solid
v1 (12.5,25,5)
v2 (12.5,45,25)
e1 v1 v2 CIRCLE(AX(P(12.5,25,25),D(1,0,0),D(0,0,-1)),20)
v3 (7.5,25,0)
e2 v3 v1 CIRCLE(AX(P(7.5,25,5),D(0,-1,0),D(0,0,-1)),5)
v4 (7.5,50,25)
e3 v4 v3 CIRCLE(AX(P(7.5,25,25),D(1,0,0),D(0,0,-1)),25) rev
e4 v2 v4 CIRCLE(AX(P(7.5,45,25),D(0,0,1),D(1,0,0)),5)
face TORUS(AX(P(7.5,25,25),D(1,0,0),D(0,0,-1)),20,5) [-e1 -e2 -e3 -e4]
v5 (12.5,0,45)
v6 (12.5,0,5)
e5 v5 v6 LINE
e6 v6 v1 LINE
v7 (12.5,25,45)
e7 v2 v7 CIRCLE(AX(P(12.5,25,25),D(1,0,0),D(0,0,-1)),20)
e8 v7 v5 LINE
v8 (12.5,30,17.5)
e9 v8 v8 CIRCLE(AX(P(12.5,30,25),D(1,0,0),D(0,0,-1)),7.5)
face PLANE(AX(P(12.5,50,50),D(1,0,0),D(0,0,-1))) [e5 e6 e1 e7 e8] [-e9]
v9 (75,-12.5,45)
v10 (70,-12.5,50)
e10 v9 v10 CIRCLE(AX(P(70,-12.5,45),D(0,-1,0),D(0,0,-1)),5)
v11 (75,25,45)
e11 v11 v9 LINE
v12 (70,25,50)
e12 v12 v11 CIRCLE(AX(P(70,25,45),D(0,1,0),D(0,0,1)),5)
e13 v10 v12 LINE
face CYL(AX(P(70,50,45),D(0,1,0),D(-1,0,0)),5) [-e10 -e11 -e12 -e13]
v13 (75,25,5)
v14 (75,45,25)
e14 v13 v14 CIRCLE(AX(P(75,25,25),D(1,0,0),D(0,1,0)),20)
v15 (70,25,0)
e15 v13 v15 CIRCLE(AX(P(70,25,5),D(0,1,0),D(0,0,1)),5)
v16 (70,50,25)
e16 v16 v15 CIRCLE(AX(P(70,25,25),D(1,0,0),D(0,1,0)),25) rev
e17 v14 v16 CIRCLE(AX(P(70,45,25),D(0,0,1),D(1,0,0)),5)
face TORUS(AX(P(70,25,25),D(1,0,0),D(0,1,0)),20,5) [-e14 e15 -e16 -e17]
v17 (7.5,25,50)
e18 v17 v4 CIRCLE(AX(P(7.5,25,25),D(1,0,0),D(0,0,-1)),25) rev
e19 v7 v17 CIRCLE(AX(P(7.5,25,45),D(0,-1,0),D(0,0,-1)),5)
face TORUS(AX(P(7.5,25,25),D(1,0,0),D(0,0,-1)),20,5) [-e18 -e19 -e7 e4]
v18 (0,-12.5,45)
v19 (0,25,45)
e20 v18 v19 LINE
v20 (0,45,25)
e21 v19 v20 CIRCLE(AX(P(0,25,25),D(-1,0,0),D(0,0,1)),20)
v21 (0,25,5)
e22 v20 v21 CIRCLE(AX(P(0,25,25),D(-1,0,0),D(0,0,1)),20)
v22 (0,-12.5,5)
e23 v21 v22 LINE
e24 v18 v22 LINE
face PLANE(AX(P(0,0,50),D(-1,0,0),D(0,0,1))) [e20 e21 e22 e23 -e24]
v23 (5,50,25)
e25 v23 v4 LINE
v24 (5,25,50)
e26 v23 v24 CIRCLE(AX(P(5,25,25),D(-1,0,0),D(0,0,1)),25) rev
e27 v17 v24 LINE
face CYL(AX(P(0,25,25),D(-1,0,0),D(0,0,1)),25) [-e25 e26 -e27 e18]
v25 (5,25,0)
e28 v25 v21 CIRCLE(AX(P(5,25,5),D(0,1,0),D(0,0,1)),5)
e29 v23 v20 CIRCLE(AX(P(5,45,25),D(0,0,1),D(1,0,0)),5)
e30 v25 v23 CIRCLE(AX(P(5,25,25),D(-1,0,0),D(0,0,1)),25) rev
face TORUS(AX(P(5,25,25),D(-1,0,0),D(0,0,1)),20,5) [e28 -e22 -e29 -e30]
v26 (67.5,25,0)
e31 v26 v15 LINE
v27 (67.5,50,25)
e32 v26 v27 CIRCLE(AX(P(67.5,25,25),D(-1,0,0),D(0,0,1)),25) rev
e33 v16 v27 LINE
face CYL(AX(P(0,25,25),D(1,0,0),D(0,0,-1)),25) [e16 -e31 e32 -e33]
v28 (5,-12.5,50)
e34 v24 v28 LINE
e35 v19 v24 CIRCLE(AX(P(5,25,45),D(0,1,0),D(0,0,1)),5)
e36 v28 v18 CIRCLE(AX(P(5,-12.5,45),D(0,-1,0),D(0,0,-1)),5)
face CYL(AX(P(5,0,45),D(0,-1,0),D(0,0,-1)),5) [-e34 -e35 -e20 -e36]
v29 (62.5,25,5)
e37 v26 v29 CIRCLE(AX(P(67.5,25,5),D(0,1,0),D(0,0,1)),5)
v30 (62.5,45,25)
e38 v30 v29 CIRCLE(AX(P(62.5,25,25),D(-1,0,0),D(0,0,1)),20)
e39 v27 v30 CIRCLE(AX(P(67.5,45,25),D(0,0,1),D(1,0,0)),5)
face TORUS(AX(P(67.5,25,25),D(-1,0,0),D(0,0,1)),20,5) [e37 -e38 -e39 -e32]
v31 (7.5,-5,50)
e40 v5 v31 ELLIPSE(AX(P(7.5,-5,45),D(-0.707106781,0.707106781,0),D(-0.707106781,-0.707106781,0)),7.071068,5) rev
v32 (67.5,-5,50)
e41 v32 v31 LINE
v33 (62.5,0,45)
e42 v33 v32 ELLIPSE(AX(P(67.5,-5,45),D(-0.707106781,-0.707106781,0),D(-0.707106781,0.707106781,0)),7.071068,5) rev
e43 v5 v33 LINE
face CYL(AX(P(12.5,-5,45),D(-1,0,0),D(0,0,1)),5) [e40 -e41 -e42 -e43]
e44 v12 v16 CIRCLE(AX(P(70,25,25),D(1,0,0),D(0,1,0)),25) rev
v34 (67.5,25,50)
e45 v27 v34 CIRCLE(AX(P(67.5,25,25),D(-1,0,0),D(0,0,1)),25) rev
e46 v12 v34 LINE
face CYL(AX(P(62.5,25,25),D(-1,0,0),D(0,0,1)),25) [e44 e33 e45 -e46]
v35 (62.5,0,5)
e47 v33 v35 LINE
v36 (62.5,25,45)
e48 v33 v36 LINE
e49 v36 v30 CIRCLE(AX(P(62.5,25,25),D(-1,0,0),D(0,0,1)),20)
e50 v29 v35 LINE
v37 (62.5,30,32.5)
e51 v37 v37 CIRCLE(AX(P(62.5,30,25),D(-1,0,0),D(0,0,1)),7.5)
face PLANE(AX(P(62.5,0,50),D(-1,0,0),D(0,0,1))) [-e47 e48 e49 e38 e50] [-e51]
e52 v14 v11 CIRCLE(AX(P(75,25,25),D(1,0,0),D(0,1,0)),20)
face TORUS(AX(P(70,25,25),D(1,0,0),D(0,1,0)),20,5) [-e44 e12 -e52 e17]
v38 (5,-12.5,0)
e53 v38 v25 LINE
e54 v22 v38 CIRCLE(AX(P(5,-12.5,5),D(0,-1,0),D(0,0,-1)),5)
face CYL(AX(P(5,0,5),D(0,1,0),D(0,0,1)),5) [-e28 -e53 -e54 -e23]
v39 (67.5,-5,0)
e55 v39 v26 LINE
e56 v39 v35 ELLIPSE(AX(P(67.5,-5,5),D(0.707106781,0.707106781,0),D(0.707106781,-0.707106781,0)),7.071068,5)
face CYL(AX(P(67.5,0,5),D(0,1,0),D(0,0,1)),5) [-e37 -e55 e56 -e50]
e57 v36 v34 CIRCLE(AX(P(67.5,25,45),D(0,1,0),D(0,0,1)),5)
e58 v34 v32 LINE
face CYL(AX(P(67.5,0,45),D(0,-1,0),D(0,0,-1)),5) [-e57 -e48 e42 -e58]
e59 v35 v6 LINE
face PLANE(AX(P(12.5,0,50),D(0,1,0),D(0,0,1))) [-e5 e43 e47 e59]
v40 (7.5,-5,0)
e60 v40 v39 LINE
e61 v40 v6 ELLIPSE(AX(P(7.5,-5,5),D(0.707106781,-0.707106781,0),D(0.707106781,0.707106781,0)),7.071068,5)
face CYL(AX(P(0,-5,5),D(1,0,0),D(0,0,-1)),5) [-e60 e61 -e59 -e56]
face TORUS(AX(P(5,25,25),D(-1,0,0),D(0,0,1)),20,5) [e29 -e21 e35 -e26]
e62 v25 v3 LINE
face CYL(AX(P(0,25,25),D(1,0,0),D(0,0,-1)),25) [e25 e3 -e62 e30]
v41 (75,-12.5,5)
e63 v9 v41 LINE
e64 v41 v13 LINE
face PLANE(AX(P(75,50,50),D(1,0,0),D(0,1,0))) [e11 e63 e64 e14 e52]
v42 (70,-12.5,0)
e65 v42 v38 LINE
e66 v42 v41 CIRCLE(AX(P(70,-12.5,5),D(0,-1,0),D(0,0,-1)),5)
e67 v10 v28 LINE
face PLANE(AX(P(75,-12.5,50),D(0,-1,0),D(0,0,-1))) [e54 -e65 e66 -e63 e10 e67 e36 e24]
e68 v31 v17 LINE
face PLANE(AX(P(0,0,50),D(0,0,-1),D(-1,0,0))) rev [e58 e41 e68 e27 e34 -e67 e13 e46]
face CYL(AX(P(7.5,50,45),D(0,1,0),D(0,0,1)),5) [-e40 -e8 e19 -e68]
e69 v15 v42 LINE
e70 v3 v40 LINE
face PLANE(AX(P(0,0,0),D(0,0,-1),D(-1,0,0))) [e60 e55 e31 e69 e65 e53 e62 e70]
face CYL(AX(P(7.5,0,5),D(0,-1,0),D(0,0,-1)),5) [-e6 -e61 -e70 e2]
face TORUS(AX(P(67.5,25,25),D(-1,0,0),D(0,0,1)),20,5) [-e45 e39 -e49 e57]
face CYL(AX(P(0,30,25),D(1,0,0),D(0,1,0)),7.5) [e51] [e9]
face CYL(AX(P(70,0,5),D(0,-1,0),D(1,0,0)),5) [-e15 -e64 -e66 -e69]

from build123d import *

# Parameters (mm, degrees)
SALIENTE_EXTRUIR1_DEPTH = 50
CROQUIS2_R              = 7.5
SALIENTE_EXTRUIR2_DEPTH = 75
REDONDEO1_R             = 25
REDONDEO2_R             = 5


with BuildPart() as part:
    # Croquis1 → Saliente-Extruir1 (new body)
    with BuildSketch(Plane.XY):
        Polygon((0, 0), (0, 50), (12.5, 50), (12.5, 0), (62.5, 0), (62.5, 50), (75, 50), (75, -12.5), (0, -12.5), align=None)
    extrude(amount=SALIENTE_EXTRUIR1_DEPTH)

    # Croquis2 → Saliente-Extruir2 (add)
    with BuildSketch(Plane(origin=(75, 0, 0), x_dir=(0, 0, -1), z_dir=(1, 0, 0))):
        with Locations(Location((-25, 30, 0), (0, 0, 180))):
            Circle(CROQUIS2_R)
    extrude(amount=-SALIENTE_EXTRUIR2_DEPTH)

    # Redondeo1
    redondeo1_edges = [part.edges().sort_by_distance(p)[0] for p in [
        (6.25, 50, 0),
        (6.25, 50, 50),
        (68.75, 50, 50),
        (68.75, 50, 0),
    ]]
    fillet(redondeo1_edges, radius=REDONDEO1_R - 0.0001)  # a hair under: the kernel refuses the full size

    # Redondeo2
    redondeo2_edges = [part.edges().sort_by_distance(p)[0] for p in [
        (0, 6.25005, 50),
        (0, 6.25005, 0),
        (37.5, 0, 50),
        (62.5, 12.50005, 50),
        (75, 6.25005, 0),
        (12.5, 12.50005, 0),
        (12.5, 12.50005, 50),
        (12.5, 42.677698819, 42.677698819),
        (12.5, 42.677698819, 7.322301181),
        (0, 42.677698819, 42.677698819),
        (0, 42.677698819, 7.322301181),
        (75, 6.25005, 50),
        (75, 42.677698819, 7.322301181),
        (75, 42.677698819, 42.677698819),
        (62.5, 42.677698819, 7.322301181),
        (62.5, 42.677698819, 42.677698819),
        (62.5, 12.50005, 0),
        (37.5, 0, 0),
    ]]
    fillet(redondeo2_edges, radius=REDONDEO2_R)


solid = part.part
